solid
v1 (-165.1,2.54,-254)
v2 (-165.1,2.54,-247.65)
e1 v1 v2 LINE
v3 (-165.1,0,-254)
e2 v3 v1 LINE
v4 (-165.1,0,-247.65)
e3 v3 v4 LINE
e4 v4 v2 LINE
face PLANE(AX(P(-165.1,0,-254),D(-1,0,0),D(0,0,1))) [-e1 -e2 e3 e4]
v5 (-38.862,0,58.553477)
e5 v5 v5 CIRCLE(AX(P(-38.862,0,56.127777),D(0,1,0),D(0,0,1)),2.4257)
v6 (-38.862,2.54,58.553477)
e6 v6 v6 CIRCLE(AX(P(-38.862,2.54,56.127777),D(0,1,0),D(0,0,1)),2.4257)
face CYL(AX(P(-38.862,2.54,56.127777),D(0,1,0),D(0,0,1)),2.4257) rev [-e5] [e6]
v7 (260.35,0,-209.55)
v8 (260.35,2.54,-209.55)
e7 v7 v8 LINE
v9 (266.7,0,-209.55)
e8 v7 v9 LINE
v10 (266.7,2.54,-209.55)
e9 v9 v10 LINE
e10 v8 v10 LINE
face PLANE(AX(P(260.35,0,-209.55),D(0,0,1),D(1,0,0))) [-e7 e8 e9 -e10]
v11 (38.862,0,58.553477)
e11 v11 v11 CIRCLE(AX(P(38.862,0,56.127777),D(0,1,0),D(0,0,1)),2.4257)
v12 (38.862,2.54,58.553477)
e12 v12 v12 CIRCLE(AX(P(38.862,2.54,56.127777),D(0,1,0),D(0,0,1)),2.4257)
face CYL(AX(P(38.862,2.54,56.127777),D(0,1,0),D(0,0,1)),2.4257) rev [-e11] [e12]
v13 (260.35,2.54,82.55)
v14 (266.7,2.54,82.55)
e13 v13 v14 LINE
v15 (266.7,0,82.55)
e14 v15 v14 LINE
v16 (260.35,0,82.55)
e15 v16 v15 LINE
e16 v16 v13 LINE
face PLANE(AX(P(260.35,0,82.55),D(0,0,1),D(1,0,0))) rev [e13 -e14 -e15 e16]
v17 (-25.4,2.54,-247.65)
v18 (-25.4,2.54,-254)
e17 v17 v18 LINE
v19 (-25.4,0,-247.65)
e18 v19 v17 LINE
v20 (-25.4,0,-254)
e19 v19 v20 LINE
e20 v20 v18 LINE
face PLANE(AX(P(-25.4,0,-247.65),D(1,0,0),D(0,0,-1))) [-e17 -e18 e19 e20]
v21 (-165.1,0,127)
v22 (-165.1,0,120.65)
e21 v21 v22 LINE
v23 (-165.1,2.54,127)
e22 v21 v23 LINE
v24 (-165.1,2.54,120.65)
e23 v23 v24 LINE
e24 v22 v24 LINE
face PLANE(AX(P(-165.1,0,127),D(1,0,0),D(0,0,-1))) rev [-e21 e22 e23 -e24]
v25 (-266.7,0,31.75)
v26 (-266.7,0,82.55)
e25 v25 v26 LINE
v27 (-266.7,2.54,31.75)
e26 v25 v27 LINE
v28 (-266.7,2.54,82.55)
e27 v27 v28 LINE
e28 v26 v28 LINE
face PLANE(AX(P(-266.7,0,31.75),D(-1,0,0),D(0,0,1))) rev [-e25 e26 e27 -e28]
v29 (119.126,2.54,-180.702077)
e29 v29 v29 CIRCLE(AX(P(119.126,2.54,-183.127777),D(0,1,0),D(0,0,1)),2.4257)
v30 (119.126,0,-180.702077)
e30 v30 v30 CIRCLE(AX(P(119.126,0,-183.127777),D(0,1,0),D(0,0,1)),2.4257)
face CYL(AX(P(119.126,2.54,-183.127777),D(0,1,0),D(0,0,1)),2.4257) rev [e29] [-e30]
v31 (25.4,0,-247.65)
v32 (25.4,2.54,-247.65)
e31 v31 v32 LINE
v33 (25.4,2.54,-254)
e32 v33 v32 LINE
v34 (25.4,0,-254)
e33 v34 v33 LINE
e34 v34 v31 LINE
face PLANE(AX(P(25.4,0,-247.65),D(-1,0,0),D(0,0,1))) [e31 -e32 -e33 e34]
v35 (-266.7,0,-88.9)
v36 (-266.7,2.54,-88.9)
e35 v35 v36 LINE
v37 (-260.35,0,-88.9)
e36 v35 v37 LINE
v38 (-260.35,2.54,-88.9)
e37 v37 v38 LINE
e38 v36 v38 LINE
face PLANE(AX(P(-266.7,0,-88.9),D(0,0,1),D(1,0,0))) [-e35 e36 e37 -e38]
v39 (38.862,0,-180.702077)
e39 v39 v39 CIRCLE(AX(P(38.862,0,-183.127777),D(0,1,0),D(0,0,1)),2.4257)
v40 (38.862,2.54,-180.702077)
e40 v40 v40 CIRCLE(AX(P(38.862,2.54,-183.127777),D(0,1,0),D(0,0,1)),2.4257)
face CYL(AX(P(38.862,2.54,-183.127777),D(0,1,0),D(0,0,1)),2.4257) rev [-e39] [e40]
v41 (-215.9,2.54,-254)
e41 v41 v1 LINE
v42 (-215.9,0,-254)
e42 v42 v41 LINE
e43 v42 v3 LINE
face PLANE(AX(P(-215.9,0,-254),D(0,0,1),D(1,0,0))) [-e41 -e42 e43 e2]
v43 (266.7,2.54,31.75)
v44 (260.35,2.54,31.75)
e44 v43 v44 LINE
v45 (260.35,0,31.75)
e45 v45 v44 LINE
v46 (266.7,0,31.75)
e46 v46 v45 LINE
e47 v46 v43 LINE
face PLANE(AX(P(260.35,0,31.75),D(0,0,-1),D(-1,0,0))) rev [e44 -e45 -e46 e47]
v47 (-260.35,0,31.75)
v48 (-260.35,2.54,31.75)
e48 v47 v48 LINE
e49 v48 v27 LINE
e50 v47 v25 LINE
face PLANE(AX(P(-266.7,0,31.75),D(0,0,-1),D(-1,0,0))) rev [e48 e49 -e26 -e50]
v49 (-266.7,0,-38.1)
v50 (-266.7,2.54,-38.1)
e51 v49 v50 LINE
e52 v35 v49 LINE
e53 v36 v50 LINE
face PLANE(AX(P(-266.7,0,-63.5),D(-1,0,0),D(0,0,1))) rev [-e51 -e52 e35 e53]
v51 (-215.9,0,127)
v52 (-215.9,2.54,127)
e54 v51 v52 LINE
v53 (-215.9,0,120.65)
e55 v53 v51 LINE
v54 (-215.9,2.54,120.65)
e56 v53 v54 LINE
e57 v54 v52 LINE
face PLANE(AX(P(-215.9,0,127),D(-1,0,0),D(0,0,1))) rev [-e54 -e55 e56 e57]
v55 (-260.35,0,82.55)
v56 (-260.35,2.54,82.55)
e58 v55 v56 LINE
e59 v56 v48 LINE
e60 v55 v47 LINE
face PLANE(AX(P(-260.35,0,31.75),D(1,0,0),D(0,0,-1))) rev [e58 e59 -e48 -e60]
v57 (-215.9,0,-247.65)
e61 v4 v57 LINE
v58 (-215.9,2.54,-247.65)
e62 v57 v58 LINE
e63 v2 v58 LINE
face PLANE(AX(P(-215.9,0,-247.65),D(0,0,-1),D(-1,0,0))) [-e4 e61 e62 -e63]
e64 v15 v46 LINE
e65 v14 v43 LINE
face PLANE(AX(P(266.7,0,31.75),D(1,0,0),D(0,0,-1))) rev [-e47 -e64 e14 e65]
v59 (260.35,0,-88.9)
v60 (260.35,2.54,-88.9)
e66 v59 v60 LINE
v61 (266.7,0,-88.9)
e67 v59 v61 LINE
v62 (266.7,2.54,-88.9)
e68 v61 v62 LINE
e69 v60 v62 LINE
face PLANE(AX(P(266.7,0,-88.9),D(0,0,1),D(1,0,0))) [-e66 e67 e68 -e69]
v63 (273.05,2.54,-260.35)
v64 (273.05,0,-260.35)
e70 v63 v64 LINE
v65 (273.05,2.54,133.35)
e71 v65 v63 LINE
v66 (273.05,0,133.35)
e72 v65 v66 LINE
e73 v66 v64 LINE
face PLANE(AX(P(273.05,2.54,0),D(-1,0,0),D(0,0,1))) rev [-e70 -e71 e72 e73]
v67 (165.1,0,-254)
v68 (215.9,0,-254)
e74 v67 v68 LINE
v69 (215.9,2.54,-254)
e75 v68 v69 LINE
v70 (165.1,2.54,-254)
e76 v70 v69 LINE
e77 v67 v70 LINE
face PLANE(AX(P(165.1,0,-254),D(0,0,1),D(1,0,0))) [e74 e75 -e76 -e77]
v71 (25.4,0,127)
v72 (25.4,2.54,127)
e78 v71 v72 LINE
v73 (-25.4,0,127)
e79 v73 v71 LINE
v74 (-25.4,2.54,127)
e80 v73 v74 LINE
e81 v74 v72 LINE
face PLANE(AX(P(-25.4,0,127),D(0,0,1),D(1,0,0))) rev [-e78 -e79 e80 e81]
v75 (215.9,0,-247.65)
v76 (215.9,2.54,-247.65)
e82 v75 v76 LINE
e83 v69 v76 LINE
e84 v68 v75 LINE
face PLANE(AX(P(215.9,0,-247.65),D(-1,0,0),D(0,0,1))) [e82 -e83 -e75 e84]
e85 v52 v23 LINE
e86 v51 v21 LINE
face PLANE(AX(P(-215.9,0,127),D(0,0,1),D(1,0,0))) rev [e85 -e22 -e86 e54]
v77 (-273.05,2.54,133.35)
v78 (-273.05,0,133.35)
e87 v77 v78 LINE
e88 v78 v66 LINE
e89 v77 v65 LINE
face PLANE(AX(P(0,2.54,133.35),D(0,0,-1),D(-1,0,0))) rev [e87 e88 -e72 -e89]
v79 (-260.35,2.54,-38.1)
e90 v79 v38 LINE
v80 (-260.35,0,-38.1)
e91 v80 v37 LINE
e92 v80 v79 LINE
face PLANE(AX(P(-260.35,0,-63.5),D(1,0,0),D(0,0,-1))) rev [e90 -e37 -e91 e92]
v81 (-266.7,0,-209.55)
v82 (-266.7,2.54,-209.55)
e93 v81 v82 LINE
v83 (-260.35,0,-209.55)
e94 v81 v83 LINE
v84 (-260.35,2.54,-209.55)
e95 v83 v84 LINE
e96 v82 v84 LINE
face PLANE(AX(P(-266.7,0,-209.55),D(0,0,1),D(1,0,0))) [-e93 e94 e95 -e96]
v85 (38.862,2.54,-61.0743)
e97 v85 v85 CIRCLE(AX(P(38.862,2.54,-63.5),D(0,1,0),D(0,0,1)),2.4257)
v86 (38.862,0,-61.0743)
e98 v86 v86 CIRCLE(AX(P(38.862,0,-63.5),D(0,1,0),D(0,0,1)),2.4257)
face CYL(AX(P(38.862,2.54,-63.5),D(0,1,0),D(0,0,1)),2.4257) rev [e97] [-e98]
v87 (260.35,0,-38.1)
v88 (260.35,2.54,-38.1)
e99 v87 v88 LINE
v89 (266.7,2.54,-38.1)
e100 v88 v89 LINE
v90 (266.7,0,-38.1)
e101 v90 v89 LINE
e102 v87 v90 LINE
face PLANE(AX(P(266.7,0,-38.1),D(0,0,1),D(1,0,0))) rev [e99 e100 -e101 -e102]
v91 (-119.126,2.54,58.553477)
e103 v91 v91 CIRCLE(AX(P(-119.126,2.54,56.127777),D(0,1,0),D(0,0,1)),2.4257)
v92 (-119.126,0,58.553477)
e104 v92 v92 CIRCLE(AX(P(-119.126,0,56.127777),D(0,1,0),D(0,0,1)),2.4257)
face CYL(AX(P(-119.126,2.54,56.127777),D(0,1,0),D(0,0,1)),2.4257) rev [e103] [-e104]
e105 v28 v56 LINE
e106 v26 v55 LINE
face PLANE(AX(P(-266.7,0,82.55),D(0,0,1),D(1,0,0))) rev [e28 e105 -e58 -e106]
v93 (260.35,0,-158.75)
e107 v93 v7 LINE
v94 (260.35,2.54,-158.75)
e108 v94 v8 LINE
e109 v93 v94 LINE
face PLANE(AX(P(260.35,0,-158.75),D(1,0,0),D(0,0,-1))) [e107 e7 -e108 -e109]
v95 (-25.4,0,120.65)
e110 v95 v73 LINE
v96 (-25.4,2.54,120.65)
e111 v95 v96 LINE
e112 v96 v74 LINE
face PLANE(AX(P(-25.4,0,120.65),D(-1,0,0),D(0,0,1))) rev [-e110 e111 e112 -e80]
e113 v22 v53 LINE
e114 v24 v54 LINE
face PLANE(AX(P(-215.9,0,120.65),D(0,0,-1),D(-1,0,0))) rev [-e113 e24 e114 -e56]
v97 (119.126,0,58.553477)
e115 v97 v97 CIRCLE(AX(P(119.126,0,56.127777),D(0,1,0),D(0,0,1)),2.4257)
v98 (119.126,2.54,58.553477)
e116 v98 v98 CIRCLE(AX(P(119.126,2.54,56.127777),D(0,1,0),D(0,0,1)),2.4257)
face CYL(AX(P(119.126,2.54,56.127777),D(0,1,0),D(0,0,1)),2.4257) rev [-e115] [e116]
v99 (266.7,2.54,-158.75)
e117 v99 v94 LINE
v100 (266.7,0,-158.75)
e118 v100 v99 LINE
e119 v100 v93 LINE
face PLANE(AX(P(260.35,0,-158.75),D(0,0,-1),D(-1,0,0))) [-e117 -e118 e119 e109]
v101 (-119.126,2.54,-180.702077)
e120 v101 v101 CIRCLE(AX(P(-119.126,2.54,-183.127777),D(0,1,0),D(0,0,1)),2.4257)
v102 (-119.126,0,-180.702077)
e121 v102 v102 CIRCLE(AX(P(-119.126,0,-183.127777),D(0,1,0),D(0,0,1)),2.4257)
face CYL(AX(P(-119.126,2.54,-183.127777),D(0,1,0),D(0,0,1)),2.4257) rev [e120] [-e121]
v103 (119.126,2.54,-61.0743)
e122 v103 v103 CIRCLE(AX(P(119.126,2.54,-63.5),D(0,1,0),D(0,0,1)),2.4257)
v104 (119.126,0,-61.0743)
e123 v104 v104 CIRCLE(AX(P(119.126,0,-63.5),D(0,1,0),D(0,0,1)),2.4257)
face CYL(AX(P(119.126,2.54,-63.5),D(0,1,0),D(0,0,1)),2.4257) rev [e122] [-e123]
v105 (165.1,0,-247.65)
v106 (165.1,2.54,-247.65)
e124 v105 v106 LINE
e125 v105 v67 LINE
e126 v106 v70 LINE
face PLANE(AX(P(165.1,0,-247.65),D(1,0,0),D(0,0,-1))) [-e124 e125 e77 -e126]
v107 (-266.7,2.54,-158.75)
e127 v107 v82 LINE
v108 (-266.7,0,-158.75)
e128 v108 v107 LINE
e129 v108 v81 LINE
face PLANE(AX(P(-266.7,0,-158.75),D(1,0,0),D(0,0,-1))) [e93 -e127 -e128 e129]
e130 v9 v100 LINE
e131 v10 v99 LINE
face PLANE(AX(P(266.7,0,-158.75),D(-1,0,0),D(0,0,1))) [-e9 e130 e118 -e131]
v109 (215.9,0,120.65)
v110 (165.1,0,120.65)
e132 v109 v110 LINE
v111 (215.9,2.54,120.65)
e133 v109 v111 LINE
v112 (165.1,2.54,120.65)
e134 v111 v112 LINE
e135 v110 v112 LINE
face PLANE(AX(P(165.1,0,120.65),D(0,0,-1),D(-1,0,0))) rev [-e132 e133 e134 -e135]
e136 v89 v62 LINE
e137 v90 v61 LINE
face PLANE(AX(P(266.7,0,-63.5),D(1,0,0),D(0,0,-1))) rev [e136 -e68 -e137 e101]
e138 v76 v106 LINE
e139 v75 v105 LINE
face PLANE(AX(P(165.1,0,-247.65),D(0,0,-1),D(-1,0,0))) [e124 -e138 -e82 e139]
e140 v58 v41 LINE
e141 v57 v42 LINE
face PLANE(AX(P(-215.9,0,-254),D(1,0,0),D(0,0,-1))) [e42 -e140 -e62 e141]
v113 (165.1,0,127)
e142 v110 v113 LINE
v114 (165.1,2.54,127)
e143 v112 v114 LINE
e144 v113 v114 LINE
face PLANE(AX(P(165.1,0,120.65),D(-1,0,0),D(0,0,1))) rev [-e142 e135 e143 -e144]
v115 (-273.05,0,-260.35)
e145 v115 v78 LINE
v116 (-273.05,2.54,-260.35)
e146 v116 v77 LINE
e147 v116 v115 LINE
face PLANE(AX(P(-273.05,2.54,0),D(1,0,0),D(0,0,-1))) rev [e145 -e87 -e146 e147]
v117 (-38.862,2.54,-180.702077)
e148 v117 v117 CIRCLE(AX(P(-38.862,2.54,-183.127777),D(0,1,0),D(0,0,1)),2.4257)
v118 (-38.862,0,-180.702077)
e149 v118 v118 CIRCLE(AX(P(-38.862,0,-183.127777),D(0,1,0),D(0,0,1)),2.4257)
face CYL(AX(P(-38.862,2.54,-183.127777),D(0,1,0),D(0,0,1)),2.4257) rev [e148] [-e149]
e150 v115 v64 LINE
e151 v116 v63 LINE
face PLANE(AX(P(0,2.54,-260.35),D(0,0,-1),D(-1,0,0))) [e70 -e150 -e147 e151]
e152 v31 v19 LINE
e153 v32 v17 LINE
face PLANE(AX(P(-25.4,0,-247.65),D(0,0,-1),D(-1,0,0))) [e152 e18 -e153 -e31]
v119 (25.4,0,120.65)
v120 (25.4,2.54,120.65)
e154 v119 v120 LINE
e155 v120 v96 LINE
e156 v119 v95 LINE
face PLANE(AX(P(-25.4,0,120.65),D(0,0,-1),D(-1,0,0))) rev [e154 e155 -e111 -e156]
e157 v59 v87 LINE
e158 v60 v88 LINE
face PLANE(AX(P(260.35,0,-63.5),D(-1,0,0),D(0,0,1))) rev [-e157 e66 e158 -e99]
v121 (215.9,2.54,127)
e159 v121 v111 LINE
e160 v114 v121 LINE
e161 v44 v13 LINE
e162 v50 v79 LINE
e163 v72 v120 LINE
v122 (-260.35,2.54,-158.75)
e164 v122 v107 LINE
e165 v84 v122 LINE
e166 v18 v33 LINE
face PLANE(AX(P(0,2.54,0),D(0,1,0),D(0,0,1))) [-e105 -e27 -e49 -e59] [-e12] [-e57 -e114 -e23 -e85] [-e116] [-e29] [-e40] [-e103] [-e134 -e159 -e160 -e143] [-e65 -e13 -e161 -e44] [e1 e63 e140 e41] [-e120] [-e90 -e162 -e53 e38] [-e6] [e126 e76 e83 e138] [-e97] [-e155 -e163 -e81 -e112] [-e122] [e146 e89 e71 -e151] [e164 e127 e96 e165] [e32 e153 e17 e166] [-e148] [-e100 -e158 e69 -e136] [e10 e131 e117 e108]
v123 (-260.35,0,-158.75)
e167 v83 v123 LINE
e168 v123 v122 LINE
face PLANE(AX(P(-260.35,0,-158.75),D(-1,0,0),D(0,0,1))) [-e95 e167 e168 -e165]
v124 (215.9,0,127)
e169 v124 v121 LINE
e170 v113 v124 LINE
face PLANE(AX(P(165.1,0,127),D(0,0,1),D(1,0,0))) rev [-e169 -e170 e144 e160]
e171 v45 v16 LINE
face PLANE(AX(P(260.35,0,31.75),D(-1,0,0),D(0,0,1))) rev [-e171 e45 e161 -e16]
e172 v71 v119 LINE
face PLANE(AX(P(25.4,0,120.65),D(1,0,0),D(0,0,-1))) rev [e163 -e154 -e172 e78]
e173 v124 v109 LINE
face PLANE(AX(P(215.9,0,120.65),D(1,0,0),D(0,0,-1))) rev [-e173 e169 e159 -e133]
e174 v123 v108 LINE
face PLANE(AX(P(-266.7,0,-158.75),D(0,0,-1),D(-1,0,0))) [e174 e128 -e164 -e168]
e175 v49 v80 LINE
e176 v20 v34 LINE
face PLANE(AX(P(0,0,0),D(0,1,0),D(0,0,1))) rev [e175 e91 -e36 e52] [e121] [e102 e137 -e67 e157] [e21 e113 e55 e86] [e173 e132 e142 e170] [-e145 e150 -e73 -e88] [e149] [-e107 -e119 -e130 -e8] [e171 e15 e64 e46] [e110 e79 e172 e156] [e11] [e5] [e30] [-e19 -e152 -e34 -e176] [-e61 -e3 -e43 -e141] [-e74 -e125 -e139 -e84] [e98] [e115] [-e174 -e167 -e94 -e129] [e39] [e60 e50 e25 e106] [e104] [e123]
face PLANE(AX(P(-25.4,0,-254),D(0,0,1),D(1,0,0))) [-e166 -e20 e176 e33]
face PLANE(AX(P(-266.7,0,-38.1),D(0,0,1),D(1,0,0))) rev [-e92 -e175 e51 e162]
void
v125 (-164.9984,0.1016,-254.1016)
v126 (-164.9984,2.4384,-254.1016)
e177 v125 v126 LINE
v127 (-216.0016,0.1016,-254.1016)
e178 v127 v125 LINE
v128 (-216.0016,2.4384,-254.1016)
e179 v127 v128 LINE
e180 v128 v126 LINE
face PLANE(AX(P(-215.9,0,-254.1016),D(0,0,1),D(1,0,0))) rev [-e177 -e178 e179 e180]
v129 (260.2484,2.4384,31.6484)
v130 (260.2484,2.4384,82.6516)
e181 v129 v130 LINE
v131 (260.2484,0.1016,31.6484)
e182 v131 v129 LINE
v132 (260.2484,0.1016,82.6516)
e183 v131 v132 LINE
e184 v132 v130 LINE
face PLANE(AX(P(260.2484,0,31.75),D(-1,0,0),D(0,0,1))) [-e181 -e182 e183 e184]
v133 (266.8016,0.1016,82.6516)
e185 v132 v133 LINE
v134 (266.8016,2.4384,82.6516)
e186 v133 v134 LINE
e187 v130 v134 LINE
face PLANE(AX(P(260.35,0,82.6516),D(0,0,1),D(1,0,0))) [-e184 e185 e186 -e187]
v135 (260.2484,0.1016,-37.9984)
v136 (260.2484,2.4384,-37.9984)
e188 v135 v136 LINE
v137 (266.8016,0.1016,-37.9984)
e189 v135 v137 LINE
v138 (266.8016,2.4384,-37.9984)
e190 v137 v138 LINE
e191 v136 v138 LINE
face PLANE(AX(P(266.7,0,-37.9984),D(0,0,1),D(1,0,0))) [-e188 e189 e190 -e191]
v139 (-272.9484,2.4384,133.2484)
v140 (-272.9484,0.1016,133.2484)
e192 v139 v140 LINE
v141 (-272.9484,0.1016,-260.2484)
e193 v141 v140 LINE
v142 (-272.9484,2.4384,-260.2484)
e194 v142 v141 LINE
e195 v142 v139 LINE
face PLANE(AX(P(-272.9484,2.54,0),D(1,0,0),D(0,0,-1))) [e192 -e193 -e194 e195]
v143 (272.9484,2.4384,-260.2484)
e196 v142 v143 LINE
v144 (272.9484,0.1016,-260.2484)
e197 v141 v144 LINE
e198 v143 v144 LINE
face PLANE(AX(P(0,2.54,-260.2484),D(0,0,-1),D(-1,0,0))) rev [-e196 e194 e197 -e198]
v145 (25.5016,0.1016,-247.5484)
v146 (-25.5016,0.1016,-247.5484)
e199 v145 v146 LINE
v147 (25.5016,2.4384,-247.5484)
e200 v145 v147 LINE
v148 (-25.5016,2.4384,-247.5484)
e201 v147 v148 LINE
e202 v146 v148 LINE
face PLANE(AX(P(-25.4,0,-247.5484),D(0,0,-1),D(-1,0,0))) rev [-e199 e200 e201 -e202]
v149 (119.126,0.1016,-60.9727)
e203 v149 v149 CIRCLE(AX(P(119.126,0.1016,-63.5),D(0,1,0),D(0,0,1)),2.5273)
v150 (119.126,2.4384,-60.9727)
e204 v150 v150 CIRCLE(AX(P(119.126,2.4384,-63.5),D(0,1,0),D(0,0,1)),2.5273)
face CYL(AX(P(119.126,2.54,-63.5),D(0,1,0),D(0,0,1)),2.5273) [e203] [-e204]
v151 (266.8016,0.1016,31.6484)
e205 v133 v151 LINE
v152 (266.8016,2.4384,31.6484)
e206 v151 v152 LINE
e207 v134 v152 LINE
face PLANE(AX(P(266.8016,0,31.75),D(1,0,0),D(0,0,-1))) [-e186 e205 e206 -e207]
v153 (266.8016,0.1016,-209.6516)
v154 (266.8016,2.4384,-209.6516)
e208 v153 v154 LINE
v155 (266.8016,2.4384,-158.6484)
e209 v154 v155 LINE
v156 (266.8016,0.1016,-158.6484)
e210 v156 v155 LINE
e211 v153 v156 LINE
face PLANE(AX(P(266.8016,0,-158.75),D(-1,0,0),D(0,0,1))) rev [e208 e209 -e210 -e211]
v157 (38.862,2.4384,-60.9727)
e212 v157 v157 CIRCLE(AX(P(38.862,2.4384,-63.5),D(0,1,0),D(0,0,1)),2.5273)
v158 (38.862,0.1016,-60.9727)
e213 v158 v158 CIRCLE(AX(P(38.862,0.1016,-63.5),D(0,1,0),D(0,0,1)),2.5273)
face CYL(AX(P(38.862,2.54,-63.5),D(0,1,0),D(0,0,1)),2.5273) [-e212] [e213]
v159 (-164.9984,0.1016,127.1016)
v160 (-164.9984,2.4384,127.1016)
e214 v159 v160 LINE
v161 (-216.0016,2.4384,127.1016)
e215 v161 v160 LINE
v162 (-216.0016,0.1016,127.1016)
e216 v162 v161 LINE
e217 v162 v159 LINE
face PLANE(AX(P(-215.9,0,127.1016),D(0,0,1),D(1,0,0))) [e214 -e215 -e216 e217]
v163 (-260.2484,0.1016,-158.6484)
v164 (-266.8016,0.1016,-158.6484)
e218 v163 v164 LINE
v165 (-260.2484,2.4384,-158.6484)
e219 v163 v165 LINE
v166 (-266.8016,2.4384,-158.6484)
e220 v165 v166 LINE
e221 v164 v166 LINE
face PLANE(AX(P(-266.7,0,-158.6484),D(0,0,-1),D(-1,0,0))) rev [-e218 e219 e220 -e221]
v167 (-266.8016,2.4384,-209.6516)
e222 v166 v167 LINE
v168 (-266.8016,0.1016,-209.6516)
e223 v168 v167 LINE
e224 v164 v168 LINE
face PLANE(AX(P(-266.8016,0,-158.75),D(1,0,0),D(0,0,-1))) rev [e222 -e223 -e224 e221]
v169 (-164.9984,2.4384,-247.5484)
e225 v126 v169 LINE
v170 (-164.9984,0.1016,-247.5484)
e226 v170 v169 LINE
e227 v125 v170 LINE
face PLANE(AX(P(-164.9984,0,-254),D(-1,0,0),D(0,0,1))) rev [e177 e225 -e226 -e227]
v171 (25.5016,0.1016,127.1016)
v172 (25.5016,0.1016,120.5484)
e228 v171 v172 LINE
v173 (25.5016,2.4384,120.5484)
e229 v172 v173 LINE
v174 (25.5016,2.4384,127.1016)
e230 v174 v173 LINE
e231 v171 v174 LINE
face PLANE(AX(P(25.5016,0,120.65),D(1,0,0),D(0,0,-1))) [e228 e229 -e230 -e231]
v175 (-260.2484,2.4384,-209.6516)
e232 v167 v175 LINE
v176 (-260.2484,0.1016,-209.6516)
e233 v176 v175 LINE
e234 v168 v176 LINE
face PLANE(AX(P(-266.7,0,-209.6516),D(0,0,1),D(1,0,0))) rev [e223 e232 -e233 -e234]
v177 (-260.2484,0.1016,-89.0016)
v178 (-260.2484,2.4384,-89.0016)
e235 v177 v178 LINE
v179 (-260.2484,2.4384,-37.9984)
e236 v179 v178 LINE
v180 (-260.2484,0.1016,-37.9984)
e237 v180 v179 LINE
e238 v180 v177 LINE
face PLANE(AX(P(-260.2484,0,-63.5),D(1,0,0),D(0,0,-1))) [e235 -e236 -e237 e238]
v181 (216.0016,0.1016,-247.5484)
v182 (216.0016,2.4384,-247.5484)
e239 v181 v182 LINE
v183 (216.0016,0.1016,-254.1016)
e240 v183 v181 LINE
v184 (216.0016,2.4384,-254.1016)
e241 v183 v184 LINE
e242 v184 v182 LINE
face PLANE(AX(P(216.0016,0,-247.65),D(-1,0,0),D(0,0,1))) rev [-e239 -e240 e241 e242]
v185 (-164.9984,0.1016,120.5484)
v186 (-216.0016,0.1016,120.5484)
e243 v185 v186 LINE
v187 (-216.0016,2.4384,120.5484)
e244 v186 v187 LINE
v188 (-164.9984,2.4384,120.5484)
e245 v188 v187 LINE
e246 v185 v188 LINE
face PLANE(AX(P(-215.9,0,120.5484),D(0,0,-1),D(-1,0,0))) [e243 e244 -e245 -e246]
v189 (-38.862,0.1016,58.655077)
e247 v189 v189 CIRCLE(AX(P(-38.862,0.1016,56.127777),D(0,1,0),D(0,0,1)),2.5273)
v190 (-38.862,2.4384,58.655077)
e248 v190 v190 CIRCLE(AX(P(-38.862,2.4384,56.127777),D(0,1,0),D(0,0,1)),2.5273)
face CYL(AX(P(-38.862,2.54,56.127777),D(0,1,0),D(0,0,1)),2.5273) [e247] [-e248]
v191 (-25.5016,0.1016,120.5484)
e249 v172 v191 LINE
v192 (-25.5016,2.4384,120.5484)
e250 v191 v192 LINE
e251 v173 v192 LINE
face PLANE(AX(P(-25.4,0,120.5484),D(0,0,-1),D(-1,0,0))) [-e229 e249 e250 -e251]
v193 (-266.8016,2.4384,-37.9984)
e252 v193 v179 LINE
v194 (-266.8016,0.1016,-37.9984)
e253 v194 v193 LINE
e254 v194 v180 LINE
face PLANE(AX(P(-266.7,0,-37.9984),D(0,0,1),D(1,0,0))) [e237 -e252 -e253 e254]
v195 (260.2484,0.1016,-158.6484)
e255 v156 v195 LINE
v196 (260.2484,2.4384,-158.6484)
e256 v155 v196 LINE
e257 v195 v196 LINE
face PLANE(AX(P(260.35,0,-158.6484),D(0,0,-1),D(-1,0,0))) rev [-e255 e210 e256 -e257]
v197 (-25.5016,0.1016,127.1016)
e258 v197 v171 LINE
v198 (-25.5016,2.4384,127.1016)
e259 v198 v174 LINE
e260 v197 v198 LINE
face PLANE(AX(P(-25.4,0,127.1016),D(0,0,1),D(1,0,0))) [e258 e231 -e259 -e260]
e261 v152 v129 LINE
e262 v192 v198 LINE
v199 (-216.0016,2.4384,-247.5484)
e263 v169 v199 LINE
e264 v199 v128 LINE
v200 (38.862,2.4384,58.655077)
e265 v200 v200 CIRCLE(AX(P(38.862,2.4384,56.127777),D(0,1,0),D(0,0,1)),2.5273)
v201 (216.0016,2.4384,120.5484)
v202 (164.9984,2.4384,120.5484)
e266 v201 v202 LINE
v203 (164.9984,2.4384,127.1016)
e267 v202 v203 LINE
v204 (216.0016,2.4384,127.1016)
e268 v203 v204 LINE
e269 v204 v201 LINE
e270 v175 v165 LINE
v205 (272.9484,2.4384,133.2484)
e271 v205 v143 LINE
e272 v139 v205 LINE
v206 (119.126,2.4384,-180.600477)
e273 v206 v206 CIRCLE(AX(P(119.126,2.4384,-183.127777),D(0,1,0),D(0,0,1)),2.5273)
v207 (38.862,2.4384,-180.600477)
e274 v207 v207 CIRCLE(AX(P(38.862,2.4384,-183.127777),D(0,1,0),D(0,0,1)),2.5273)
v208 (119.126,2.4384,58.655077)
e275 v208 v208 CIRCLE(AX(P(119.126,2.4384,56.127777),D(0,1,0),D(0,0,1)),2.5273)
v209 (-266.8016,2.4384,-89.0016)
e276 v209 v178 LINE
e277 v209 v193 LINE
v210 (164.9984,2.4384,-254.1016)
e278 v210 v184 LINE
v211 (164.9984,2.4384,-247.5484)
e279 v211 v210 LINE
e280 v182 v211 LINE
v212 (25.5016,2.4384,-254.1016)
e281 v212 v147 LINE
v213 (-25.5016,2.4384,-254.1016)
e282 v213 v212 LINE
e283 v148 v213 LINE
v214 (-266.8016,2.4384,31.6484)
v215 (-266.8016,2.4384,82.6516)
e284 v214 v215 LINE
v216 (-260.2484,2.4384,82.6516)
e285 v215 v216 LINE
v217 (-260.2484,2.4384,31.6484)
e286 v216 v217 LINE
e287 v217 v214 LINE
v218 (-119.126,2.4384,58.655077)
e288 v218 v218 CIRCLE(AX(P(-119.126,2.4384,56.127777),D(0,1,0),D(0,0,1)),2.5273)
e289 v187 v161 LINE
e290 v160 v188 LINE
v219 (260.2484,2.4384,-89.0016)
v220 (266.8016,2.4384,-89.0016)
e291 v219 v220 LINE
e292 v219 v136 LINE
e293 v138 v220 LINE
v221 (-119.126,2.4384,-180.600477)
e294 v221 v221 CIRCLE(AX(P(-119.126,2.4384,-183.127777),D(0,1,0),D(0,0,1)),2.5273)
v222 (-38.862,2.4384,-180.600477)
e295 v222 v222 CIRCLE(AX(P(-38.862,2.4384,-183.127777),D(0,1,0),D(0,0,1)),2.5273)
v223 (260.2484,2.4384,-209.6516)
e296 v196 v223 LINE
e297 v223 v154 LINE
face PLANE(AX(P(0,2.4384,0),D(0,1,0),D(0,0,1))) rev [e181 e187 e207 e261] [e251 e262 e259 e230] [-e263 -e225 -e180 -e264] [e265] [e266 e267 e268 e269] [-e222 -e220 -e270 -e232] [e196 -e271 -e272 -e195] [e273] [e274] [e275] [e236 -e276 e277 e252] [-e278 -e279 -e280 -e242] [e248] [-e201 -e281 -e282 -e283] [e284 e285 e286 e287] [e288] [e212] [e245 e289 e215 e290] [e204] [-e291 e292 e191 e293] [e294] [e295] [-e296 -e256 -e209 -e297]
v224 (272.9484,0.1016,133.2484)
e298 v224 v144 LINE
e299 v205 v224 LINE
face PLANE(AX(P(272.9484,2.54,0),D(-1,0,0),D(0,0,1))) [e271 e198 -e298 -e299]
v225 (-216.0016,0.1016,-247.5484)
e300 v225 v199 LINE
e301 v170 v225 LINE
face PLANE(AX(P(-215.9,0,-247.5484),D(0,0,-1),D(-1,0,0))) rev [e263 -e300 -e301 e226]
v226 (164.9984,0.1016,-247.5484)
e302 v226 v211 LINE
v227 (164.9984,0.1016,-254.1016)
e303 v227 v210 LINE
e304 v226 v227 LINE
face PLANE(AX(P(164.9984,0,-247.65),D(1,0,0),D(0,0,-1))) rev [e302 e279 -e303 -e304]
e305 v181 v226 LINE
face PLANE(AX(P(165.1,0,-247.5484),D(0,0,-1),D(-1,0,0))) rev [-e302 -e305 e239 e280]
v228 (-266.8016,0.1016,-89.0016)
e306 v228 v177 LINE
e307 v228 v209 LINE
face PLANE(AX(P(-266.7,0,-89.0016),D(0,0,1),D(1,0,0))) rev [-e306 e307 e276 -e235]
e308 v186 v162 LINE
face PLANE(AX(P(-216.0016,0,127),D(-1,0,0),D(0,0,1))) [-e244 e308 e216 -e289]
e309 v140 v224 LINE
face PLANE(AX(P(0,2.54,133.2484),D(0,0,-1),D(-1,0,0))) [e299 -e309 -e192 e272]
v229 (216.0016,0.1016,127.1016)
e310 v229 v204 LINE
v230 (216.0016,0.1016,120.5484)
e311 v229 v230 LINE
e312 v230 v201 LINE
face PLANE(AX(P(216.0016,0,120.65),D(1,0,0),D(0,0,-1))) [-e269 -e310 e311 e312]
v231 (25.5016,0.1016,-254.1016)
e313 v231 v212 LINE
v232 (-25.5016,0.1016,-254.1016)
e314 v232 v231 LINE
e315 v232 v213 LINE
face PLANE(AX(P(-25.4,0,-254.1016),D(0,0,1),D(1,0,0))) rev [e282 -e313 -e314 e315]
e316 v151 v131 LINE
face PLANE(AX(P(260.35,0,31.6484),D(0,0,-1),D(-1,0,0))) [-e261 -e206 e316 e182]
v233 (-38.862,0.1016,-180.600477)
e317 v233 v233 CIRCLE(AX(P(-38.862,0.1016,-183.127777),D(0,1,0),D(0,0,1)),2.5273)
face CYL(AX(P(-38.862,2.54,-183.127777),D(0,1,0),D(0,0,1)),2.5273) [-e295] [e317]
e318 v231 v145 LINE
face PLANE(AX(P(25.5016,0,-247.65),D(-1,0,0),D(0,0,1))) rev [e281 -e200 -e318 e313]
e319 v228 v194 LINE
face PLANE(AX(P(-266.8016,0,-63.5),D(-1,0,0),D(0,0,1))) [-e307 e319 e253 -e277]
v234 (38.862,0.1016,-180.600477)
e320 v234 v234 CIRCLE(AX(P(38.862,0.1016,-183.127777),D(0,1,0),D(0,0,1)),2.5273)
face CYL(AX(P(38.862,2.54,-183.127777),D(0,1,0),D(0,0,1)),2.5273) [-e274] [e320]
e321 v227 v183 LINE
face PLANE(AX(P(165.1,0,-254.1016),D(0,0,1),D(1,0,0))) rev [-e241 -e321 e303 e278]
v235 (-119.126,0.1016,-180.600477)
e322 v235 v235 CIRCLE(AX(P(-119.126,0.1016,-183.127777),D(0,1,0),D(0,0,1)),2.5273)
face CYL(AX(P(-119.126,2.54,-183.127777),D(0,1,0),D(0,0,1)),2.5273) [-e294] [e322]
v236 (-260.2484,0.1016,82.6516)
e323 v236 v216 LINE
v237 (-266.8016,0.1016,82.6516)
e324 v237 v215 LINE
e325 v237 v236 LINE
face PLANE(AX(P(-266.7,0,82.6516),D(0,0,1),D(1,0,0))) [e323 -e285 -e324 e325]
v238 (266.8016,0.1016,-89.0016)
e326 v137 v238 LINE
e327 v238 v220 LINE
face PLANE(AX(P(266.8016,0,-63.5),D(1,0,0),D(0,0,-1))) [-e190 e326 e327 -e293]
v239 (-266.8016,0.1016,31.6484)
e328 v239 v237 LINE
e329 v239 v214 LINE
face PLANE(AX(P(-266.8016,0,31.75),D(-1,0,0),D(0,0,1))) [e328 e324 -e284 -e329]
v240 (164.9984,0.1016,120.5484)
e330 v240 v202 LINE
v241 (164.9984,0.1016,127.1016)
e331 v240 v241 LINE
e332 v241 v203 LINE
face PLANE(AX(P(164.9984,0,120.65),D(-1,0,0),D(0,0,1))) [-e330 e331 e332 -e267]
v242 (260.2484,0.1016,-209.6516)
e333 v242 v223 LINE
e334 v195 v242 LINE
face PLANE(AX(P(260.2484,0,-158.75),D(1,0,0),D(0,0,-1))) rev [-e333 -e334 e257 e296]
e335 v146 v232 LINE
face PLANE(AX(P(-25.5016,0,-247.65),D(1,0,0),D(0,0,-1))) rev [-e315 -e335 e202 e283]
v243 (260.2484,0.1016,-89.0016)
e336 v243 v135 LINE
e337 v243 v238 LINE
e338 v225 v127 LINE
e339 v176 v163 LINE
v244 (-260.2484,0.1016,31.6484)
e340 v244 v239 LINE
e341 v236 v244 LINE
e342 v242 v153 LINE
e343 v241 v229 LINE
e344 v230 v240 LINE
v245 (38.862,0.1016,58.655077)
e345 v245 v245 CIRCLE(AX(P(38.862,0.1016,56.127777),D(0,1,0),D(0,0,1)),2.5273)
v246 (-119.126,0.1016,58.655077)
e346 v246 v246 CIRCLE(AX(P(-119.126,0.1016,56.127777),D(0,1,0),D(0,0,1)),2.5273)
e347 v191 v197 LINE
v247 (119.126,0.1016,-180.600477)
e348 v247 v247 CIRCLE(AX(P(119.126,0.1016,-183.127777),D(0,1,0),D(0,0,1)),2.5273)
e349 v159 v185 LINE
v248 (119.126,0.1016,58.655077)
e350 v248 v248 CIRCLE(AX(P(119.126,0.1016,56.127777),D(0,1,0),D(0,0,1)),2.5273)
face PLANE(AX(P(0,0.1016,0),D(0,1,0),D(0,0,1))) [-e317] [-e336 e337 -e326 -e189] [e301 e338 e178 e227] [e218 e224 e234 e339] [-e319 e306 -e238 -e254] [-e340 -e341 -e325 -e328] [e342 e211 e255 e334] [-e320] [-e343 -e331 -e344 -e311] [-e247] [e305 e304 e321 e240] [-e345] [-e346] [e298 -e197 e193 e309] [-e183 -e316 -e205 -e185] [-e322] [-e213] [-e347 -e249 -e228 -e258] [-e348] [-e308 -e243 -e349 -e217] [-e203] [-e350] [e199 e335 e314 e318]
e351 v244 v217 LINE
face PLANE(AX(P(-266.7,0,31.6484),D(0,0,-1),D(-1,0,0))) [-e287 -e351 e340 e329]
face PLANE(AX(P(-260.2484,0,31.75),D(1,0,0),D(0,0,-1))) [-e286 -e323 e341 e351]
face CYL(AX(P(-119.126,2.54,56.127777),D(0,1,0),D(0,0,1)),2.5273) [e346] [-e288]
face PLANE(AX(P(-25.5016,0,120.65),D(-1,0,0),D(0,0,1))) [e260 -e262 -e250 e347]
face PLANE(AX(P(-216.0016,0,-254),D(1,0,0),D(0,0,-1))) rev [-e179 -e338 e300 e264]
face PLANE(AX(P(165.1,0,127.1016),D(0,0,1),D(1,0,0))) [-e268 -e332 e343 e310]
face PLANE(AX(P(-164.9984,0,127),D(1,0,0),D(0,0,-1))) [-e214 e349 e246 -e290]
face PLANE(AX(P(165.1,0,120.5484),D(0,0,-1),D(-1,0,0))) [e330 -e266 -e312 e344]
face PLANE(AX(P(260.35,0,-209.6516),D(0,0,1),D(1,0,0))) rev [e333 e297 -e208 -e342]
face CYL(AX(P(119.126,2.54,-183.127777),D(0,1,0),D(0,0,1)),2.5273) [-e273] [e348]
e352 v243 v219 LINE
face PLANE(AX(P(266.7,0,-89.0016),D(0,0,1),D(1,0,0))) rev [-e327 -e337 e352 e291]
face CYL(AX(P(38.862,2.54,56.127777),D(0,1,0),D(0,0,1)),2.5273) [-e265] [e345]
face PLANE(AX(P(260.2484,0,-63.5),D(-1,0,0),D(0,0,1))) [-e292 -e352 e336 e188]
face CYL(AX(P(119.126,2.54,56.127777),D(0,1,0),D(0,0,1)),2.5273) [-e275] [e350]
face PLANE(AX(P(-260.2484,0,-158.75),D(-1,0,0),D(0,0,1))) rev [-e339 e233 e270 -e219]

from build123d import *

# Parameters (mm, degrees)
BOSS_EXTRUDE1_DEPTH         = 2.54
F_11_0_191_DIAMETER_HOLE2_D = 4.8514
F_11_0_191_DIAMETER_HOLE3_D = 4.8514
SKETCH17_W                  = 6.35
SKETCH17_H                  = 50.8
SKETCH17_W_2                = 50.8
SKETCH17_H_2                = 6.35
SKETCH17_H_3                = 25.4
CUT_EXTRUDE12_DEPTH         = 304.883162745
MIRROR1_OUTLINE_W           = 6.35
MIRROR1_OUTLINE_H           = 50.8
MIRROR1_OUTLINE_R           = 2.4257
MIRROR1_OUTLINE_W_2         = 50.8
MIRROR1_OUTLINE_H_2         = 6.35
MIRROR1_DEPTH               = 2.54
SHELL1_START                = 0.1016
SHELL1_OUTLINE_W            = 545.8968
SHELL1_OUTLINE_H            = 393.4968
SHELL1_OUTLINE_W_2          = 51.0032
SHELL1_OUTLINE_H_2          = 6.5532
SHELL1_OUTLINE_W_3          = 6.5532
SHELL1_OUTLINE_H_3          = 51.0032
SHELL1_OUTLINE_R            = 2.5273
SHELL1_DEPTH                = 2.3368


# Read off the part's stored shape, not the designer's step: Mirror1, Shell1
with BuildPart() as part:
    # Sketch1 → Boss-Extrude1 (new body)
    with BuildSketch(Plane(origin=(0, 0, 0), x_dir=(1, 0, 0), z_dir=(0, 1, 0))):
        Polygon((0, 63.5), (-273.05, 63.5), (-273.05, -63.5), (-273.05, -133.35), (273.05, -133.35), (273.05, -63.5), (273.05, 63.5), align=None)
    extrude(amount=BOSS_EXTRUDE1_DEPTH)

    # #11 (0.191) Diameter Hole2 (through all)
    with Locations(Plane(origin=(0, 2.54, 0), x_dir=(1, 0, 0), z_dir=(0, 1, 0))):
        with Locations((-119.126, -56.127777467), (-38.862, -56.127777467), (38.862, -56.127777467), (119.126, -56.127777467)):
            Hole(F_11_0_191_DIAMETER_HOLE2_D / 2)

    # #11 (0.191) Diameter Hole3 (through all)
    with Locations(Plane(origin=(0, 2.54, 0), x_dir=(1, 0, 0), z_dir=(0, 1, 0))):
        with Locations((119.126, 63.5), (38.862, 63.5)):
            Hole(F_11_0_191_DIAMETER_HOLE3_D / 2)

    # Sketch17 → Cut-Extrude12 (cut, through all)
    with BuildSketch(Plane(origin=(0, 2.54, 0), x_dir=(1, 0, 0), z_dir=(0, 1, 0))):
        with Locations((-263.525, -57.15)):
            Rectangle(SKETCH17_W, SKETCH17_H)
        with Locations((-190.5, -123.825)):
            Rectangle(SKETCH17_W_2, SKETCH17_H_2)
        with Locations((190.5, -123.825)):
            Rectangle(SKETCH17_W_2, SKETCH17_H_2)
        with Locations((263.525, -57.15)):
            Rectangle(SKETCH17_W, SKETCH17_H)
        with Locations((0, -123.825)):
            Rectangle(SKETCH17_W_2, SKETCH17_H_2)
        with Locations((-263.525, 50.8)):
            Rectangle(SKETCH17_W, SKETCH17_H_3)
        with Locations((263.525, 50.8)):
            Rectangle(SKETCH17_W, SKETCH17_H_3)
    extrude(amount=-CUT_EXTRUDE12_DEPTH, mode=Mode.SUBTRACT)

    # Mirror1 outline → Mirror1 (add)
    with BuildSketch(Plane(origin=(0, 0, 0), x_dir=(1, 0, 0), z_dir=(0, 1, 0))):
        with BuildLine():
            Line((273.05, 63.5), (273.05, 260.35))
            Line((273.05, 260.35), (-273.05, 260.35))
            Line((-273.05, 260.35), (-273.05, 63.5))
            Line((-273.05, 63.5), (-266.7, 63.5))
            Line((-266.7, 63.5), (-266.7, 88.9))
            Line((-266.7, 88.9), (-260.35, 88.9))
            Line((-260.35, 88.9), (-260.35, 63.5))
            Line((-260.35, 63.5), (36.4363, 63.5))
            ThreePointArc((36.4363, 63.5), (38.862, 65.9257), (41.2877, 63.5))
            Line((41.2877, 63.5), (116.7003, 63.5))
            ThreePointArc((116.7003, 63.5), (119.126, 65.9257), (121.5517, 63.5))
            Line((121.5517, 63.5), (260.35, 63.5))
            Line((260.35, 63.5), (260.35, 88.9))
            Line((260.35, 88.9), (266.7, 88.9))
            Line((266.7, 88.9), (266.7, 63.5))
            Line((266.7, 63.5), (273.05, 63.5))
        make_face()
        with Locations((-263.525, 184.15)):
            Rectangle(MIRROR1_OUTLINE_W, MIRROR1_OUTLINE_H, mode=Mode.SUBTRACT)
        with Locations((-119.126, 183.127777467)):
            Circle(MIRROR1_OUTLINE_R, mode=Mode.SUBTRACT)
        with Locations((-38.862, 183.127777467)):
            Circle(MIRROR1_OUTLINE_R, mode=Mode.SUBTRACT)
        with Locations((-190.5, 250.825)):
            Rectangle(MIRROR1_OUTLINE_W_2, MIRROR1_OUTLINE_H_2, mode=Mode.SUBTRACT)
        with Locations((38.862, 183.127777467)):
            Circle(MIRROR1_OUTLINE_R, mode=Mode.SUBTRACT)
        with Locations((119.126, 183.127777467)):
            Circle(MIRROR1_OUTLINE_R, mode=Mode.SUBTRACT)
        with Locations((263.525, 184.15)):
            Rectangle(MIRROR1_OUTLINE_W, MIRROR1_OUTLINE_H, mode=Mode.SUBTRACT)
        with Locations((0, 250.825)):
            Rectangle(MIRROR1_OUTLINE_W_2, MIRROR1_OUTLINE_H_2, mode=Mode.SUBTRACT)
        with Locations((190.5, 250.825)):
            Rectangle(MIRROR1_OUTLINE_W_2, MIRROR1_OUTLINE_H_2, mode=Mode.SUBTRACT)
    extrude(amount=MIRROR1_DEPTH)

    # Shell1 outline → Shell1 (cut)
    with BuildSketch(Plane(origin=(0, 0, 0), x_dir=(1, 0, 0), z_dir=(0, 1, 0)).offset(SHELL1_START)):
        with Locations((0, 63.5)):
            Rectangle(SHELL1_OUTLINE_W, SHELL1_OUTLINE_H)
        with Locations((-190.5, -123.825)):
            Rectangle(SHELL1_OUTLINE_W_2, SHELL1_OUTLINE_H_2, mode=Mode.SUBTRACT)
        with Locations((-263.525, -57.15)):
            Rectangle(SHELL1_OUTLINE_W_3, SHELL1_OUTLINE_H_3, mode=Mode.SUBTRACT)
        with Locations((-119.126, -56.127777467)):
            Circle(SHELL1_OUTLINE_R, mode=Mode.SUBTRACT)
        with Locations((-38.862, -56.127777467)):
            Circle(SHELL1_OUTLINE_R, mode=Mode.SUBTRACT)
        with Locations((0, -123.825)):
            Rectangle(SHELL1_OUTLINE_W_2, SHELL1_OUTLINE_H_2, mode=Mode.SUBTRACT)
        with Locations((38.862, -56.127777467)):
            Circle(SHELL1_OUTLINE_R, mode=Mode.SUBTRACT)
        with Locations((119.126, -56.127777467)):
            Circle(SHELL1_OUTLINE_R, mode=Mode.SUBTRACT)
        with Locations((190.5, -123.825)):
            Rectangle(SHELL1_OUTLINE_W_2, SHELL1_OUTLINE_H_2, mode=Mode.SUBTRACT)
        with Locations((263.525, -57.15)):
            Rectangle(SHELL1_OUTLINE_W_3, SHELL1_OUTLINE_H_3, mode=Mode.SUBTRACT)
        with Locations((-263.525, 63.5)):
            Rectangle(SHELL1_OUTLINE_W_3, SHELL1_OUTLINE_H_3, mode=Mode.SUBTRACT)
        with Locations((-263.525, 184.15)):
            Rectangle(SHELL1_OUTLINE_W_3, SHELL1_OUTLINE_H_3, mode=Mode.SUBTRACT)
        with Locations((-190.5, 250.825)):
            Rectangle(SHELL1_OUTLINE_W_2, SHELL1_OUTLINE_H_2, mode=Mode.SUBTRACT)
        with Locations((-119.126, 183.127777467)):
            Circle(SHELL1_OUTLINE_R, mode=Mode.SUBTRACT)
        with Locations((-38.862, 183.127777467)):
            Circle(SHELL1_OUTLINE_R, mode=Mode.SUBTRACT)
        with Locations((38.862, 63.5)):
            Circle(SHELL1_OUTLINE_R, mode=Mode.SUBTRACT)
        with Locations((119.126, 63.5)):
            Circle(SHELL1_OUTLINE_R, mode=Mode.SUBTRACT)
        with Locations((263.525, 63.5)):
            Rectangle(SHELL1_OUTLINE_W_3, SHELL1_OUTLINE_H_3, mode=Mode.SUBTRACT)
        with Locations((38.862, 183.127777467)):
            Circle(SHELL1_OUTLINE_R, mode=Mode.SUBTRACT)
        with Locations((119.126, 183.127777467)):
            Circle(SHELL1_OUTLINE_R, mode=Mode.SUBTRACT)
        with Locations((0, 250.825)):
            Rectangle(SHELL1_OUTLINE_W_2, SHELL1_OUTLINE_H_2, mode=Mode.SUBTRACT)
        with Locations((263.525, 184.15)):
            Rectangle(SHELL1_OUTLINE_W_3, SHELL1_OUTLINE_H_3, mode=Mode.SUBTRACT)
        with Locations((190.5, 250.825)):
            Rectangle(SHELL1_OUTLINE_W_2, SHELL1_OUTLINE_H_2, mode=Mode.SUBTRACT)
    extrude(amount=SHELL1_DEPTH, mode=Mode.SUBTRACT)


solid = part.part
